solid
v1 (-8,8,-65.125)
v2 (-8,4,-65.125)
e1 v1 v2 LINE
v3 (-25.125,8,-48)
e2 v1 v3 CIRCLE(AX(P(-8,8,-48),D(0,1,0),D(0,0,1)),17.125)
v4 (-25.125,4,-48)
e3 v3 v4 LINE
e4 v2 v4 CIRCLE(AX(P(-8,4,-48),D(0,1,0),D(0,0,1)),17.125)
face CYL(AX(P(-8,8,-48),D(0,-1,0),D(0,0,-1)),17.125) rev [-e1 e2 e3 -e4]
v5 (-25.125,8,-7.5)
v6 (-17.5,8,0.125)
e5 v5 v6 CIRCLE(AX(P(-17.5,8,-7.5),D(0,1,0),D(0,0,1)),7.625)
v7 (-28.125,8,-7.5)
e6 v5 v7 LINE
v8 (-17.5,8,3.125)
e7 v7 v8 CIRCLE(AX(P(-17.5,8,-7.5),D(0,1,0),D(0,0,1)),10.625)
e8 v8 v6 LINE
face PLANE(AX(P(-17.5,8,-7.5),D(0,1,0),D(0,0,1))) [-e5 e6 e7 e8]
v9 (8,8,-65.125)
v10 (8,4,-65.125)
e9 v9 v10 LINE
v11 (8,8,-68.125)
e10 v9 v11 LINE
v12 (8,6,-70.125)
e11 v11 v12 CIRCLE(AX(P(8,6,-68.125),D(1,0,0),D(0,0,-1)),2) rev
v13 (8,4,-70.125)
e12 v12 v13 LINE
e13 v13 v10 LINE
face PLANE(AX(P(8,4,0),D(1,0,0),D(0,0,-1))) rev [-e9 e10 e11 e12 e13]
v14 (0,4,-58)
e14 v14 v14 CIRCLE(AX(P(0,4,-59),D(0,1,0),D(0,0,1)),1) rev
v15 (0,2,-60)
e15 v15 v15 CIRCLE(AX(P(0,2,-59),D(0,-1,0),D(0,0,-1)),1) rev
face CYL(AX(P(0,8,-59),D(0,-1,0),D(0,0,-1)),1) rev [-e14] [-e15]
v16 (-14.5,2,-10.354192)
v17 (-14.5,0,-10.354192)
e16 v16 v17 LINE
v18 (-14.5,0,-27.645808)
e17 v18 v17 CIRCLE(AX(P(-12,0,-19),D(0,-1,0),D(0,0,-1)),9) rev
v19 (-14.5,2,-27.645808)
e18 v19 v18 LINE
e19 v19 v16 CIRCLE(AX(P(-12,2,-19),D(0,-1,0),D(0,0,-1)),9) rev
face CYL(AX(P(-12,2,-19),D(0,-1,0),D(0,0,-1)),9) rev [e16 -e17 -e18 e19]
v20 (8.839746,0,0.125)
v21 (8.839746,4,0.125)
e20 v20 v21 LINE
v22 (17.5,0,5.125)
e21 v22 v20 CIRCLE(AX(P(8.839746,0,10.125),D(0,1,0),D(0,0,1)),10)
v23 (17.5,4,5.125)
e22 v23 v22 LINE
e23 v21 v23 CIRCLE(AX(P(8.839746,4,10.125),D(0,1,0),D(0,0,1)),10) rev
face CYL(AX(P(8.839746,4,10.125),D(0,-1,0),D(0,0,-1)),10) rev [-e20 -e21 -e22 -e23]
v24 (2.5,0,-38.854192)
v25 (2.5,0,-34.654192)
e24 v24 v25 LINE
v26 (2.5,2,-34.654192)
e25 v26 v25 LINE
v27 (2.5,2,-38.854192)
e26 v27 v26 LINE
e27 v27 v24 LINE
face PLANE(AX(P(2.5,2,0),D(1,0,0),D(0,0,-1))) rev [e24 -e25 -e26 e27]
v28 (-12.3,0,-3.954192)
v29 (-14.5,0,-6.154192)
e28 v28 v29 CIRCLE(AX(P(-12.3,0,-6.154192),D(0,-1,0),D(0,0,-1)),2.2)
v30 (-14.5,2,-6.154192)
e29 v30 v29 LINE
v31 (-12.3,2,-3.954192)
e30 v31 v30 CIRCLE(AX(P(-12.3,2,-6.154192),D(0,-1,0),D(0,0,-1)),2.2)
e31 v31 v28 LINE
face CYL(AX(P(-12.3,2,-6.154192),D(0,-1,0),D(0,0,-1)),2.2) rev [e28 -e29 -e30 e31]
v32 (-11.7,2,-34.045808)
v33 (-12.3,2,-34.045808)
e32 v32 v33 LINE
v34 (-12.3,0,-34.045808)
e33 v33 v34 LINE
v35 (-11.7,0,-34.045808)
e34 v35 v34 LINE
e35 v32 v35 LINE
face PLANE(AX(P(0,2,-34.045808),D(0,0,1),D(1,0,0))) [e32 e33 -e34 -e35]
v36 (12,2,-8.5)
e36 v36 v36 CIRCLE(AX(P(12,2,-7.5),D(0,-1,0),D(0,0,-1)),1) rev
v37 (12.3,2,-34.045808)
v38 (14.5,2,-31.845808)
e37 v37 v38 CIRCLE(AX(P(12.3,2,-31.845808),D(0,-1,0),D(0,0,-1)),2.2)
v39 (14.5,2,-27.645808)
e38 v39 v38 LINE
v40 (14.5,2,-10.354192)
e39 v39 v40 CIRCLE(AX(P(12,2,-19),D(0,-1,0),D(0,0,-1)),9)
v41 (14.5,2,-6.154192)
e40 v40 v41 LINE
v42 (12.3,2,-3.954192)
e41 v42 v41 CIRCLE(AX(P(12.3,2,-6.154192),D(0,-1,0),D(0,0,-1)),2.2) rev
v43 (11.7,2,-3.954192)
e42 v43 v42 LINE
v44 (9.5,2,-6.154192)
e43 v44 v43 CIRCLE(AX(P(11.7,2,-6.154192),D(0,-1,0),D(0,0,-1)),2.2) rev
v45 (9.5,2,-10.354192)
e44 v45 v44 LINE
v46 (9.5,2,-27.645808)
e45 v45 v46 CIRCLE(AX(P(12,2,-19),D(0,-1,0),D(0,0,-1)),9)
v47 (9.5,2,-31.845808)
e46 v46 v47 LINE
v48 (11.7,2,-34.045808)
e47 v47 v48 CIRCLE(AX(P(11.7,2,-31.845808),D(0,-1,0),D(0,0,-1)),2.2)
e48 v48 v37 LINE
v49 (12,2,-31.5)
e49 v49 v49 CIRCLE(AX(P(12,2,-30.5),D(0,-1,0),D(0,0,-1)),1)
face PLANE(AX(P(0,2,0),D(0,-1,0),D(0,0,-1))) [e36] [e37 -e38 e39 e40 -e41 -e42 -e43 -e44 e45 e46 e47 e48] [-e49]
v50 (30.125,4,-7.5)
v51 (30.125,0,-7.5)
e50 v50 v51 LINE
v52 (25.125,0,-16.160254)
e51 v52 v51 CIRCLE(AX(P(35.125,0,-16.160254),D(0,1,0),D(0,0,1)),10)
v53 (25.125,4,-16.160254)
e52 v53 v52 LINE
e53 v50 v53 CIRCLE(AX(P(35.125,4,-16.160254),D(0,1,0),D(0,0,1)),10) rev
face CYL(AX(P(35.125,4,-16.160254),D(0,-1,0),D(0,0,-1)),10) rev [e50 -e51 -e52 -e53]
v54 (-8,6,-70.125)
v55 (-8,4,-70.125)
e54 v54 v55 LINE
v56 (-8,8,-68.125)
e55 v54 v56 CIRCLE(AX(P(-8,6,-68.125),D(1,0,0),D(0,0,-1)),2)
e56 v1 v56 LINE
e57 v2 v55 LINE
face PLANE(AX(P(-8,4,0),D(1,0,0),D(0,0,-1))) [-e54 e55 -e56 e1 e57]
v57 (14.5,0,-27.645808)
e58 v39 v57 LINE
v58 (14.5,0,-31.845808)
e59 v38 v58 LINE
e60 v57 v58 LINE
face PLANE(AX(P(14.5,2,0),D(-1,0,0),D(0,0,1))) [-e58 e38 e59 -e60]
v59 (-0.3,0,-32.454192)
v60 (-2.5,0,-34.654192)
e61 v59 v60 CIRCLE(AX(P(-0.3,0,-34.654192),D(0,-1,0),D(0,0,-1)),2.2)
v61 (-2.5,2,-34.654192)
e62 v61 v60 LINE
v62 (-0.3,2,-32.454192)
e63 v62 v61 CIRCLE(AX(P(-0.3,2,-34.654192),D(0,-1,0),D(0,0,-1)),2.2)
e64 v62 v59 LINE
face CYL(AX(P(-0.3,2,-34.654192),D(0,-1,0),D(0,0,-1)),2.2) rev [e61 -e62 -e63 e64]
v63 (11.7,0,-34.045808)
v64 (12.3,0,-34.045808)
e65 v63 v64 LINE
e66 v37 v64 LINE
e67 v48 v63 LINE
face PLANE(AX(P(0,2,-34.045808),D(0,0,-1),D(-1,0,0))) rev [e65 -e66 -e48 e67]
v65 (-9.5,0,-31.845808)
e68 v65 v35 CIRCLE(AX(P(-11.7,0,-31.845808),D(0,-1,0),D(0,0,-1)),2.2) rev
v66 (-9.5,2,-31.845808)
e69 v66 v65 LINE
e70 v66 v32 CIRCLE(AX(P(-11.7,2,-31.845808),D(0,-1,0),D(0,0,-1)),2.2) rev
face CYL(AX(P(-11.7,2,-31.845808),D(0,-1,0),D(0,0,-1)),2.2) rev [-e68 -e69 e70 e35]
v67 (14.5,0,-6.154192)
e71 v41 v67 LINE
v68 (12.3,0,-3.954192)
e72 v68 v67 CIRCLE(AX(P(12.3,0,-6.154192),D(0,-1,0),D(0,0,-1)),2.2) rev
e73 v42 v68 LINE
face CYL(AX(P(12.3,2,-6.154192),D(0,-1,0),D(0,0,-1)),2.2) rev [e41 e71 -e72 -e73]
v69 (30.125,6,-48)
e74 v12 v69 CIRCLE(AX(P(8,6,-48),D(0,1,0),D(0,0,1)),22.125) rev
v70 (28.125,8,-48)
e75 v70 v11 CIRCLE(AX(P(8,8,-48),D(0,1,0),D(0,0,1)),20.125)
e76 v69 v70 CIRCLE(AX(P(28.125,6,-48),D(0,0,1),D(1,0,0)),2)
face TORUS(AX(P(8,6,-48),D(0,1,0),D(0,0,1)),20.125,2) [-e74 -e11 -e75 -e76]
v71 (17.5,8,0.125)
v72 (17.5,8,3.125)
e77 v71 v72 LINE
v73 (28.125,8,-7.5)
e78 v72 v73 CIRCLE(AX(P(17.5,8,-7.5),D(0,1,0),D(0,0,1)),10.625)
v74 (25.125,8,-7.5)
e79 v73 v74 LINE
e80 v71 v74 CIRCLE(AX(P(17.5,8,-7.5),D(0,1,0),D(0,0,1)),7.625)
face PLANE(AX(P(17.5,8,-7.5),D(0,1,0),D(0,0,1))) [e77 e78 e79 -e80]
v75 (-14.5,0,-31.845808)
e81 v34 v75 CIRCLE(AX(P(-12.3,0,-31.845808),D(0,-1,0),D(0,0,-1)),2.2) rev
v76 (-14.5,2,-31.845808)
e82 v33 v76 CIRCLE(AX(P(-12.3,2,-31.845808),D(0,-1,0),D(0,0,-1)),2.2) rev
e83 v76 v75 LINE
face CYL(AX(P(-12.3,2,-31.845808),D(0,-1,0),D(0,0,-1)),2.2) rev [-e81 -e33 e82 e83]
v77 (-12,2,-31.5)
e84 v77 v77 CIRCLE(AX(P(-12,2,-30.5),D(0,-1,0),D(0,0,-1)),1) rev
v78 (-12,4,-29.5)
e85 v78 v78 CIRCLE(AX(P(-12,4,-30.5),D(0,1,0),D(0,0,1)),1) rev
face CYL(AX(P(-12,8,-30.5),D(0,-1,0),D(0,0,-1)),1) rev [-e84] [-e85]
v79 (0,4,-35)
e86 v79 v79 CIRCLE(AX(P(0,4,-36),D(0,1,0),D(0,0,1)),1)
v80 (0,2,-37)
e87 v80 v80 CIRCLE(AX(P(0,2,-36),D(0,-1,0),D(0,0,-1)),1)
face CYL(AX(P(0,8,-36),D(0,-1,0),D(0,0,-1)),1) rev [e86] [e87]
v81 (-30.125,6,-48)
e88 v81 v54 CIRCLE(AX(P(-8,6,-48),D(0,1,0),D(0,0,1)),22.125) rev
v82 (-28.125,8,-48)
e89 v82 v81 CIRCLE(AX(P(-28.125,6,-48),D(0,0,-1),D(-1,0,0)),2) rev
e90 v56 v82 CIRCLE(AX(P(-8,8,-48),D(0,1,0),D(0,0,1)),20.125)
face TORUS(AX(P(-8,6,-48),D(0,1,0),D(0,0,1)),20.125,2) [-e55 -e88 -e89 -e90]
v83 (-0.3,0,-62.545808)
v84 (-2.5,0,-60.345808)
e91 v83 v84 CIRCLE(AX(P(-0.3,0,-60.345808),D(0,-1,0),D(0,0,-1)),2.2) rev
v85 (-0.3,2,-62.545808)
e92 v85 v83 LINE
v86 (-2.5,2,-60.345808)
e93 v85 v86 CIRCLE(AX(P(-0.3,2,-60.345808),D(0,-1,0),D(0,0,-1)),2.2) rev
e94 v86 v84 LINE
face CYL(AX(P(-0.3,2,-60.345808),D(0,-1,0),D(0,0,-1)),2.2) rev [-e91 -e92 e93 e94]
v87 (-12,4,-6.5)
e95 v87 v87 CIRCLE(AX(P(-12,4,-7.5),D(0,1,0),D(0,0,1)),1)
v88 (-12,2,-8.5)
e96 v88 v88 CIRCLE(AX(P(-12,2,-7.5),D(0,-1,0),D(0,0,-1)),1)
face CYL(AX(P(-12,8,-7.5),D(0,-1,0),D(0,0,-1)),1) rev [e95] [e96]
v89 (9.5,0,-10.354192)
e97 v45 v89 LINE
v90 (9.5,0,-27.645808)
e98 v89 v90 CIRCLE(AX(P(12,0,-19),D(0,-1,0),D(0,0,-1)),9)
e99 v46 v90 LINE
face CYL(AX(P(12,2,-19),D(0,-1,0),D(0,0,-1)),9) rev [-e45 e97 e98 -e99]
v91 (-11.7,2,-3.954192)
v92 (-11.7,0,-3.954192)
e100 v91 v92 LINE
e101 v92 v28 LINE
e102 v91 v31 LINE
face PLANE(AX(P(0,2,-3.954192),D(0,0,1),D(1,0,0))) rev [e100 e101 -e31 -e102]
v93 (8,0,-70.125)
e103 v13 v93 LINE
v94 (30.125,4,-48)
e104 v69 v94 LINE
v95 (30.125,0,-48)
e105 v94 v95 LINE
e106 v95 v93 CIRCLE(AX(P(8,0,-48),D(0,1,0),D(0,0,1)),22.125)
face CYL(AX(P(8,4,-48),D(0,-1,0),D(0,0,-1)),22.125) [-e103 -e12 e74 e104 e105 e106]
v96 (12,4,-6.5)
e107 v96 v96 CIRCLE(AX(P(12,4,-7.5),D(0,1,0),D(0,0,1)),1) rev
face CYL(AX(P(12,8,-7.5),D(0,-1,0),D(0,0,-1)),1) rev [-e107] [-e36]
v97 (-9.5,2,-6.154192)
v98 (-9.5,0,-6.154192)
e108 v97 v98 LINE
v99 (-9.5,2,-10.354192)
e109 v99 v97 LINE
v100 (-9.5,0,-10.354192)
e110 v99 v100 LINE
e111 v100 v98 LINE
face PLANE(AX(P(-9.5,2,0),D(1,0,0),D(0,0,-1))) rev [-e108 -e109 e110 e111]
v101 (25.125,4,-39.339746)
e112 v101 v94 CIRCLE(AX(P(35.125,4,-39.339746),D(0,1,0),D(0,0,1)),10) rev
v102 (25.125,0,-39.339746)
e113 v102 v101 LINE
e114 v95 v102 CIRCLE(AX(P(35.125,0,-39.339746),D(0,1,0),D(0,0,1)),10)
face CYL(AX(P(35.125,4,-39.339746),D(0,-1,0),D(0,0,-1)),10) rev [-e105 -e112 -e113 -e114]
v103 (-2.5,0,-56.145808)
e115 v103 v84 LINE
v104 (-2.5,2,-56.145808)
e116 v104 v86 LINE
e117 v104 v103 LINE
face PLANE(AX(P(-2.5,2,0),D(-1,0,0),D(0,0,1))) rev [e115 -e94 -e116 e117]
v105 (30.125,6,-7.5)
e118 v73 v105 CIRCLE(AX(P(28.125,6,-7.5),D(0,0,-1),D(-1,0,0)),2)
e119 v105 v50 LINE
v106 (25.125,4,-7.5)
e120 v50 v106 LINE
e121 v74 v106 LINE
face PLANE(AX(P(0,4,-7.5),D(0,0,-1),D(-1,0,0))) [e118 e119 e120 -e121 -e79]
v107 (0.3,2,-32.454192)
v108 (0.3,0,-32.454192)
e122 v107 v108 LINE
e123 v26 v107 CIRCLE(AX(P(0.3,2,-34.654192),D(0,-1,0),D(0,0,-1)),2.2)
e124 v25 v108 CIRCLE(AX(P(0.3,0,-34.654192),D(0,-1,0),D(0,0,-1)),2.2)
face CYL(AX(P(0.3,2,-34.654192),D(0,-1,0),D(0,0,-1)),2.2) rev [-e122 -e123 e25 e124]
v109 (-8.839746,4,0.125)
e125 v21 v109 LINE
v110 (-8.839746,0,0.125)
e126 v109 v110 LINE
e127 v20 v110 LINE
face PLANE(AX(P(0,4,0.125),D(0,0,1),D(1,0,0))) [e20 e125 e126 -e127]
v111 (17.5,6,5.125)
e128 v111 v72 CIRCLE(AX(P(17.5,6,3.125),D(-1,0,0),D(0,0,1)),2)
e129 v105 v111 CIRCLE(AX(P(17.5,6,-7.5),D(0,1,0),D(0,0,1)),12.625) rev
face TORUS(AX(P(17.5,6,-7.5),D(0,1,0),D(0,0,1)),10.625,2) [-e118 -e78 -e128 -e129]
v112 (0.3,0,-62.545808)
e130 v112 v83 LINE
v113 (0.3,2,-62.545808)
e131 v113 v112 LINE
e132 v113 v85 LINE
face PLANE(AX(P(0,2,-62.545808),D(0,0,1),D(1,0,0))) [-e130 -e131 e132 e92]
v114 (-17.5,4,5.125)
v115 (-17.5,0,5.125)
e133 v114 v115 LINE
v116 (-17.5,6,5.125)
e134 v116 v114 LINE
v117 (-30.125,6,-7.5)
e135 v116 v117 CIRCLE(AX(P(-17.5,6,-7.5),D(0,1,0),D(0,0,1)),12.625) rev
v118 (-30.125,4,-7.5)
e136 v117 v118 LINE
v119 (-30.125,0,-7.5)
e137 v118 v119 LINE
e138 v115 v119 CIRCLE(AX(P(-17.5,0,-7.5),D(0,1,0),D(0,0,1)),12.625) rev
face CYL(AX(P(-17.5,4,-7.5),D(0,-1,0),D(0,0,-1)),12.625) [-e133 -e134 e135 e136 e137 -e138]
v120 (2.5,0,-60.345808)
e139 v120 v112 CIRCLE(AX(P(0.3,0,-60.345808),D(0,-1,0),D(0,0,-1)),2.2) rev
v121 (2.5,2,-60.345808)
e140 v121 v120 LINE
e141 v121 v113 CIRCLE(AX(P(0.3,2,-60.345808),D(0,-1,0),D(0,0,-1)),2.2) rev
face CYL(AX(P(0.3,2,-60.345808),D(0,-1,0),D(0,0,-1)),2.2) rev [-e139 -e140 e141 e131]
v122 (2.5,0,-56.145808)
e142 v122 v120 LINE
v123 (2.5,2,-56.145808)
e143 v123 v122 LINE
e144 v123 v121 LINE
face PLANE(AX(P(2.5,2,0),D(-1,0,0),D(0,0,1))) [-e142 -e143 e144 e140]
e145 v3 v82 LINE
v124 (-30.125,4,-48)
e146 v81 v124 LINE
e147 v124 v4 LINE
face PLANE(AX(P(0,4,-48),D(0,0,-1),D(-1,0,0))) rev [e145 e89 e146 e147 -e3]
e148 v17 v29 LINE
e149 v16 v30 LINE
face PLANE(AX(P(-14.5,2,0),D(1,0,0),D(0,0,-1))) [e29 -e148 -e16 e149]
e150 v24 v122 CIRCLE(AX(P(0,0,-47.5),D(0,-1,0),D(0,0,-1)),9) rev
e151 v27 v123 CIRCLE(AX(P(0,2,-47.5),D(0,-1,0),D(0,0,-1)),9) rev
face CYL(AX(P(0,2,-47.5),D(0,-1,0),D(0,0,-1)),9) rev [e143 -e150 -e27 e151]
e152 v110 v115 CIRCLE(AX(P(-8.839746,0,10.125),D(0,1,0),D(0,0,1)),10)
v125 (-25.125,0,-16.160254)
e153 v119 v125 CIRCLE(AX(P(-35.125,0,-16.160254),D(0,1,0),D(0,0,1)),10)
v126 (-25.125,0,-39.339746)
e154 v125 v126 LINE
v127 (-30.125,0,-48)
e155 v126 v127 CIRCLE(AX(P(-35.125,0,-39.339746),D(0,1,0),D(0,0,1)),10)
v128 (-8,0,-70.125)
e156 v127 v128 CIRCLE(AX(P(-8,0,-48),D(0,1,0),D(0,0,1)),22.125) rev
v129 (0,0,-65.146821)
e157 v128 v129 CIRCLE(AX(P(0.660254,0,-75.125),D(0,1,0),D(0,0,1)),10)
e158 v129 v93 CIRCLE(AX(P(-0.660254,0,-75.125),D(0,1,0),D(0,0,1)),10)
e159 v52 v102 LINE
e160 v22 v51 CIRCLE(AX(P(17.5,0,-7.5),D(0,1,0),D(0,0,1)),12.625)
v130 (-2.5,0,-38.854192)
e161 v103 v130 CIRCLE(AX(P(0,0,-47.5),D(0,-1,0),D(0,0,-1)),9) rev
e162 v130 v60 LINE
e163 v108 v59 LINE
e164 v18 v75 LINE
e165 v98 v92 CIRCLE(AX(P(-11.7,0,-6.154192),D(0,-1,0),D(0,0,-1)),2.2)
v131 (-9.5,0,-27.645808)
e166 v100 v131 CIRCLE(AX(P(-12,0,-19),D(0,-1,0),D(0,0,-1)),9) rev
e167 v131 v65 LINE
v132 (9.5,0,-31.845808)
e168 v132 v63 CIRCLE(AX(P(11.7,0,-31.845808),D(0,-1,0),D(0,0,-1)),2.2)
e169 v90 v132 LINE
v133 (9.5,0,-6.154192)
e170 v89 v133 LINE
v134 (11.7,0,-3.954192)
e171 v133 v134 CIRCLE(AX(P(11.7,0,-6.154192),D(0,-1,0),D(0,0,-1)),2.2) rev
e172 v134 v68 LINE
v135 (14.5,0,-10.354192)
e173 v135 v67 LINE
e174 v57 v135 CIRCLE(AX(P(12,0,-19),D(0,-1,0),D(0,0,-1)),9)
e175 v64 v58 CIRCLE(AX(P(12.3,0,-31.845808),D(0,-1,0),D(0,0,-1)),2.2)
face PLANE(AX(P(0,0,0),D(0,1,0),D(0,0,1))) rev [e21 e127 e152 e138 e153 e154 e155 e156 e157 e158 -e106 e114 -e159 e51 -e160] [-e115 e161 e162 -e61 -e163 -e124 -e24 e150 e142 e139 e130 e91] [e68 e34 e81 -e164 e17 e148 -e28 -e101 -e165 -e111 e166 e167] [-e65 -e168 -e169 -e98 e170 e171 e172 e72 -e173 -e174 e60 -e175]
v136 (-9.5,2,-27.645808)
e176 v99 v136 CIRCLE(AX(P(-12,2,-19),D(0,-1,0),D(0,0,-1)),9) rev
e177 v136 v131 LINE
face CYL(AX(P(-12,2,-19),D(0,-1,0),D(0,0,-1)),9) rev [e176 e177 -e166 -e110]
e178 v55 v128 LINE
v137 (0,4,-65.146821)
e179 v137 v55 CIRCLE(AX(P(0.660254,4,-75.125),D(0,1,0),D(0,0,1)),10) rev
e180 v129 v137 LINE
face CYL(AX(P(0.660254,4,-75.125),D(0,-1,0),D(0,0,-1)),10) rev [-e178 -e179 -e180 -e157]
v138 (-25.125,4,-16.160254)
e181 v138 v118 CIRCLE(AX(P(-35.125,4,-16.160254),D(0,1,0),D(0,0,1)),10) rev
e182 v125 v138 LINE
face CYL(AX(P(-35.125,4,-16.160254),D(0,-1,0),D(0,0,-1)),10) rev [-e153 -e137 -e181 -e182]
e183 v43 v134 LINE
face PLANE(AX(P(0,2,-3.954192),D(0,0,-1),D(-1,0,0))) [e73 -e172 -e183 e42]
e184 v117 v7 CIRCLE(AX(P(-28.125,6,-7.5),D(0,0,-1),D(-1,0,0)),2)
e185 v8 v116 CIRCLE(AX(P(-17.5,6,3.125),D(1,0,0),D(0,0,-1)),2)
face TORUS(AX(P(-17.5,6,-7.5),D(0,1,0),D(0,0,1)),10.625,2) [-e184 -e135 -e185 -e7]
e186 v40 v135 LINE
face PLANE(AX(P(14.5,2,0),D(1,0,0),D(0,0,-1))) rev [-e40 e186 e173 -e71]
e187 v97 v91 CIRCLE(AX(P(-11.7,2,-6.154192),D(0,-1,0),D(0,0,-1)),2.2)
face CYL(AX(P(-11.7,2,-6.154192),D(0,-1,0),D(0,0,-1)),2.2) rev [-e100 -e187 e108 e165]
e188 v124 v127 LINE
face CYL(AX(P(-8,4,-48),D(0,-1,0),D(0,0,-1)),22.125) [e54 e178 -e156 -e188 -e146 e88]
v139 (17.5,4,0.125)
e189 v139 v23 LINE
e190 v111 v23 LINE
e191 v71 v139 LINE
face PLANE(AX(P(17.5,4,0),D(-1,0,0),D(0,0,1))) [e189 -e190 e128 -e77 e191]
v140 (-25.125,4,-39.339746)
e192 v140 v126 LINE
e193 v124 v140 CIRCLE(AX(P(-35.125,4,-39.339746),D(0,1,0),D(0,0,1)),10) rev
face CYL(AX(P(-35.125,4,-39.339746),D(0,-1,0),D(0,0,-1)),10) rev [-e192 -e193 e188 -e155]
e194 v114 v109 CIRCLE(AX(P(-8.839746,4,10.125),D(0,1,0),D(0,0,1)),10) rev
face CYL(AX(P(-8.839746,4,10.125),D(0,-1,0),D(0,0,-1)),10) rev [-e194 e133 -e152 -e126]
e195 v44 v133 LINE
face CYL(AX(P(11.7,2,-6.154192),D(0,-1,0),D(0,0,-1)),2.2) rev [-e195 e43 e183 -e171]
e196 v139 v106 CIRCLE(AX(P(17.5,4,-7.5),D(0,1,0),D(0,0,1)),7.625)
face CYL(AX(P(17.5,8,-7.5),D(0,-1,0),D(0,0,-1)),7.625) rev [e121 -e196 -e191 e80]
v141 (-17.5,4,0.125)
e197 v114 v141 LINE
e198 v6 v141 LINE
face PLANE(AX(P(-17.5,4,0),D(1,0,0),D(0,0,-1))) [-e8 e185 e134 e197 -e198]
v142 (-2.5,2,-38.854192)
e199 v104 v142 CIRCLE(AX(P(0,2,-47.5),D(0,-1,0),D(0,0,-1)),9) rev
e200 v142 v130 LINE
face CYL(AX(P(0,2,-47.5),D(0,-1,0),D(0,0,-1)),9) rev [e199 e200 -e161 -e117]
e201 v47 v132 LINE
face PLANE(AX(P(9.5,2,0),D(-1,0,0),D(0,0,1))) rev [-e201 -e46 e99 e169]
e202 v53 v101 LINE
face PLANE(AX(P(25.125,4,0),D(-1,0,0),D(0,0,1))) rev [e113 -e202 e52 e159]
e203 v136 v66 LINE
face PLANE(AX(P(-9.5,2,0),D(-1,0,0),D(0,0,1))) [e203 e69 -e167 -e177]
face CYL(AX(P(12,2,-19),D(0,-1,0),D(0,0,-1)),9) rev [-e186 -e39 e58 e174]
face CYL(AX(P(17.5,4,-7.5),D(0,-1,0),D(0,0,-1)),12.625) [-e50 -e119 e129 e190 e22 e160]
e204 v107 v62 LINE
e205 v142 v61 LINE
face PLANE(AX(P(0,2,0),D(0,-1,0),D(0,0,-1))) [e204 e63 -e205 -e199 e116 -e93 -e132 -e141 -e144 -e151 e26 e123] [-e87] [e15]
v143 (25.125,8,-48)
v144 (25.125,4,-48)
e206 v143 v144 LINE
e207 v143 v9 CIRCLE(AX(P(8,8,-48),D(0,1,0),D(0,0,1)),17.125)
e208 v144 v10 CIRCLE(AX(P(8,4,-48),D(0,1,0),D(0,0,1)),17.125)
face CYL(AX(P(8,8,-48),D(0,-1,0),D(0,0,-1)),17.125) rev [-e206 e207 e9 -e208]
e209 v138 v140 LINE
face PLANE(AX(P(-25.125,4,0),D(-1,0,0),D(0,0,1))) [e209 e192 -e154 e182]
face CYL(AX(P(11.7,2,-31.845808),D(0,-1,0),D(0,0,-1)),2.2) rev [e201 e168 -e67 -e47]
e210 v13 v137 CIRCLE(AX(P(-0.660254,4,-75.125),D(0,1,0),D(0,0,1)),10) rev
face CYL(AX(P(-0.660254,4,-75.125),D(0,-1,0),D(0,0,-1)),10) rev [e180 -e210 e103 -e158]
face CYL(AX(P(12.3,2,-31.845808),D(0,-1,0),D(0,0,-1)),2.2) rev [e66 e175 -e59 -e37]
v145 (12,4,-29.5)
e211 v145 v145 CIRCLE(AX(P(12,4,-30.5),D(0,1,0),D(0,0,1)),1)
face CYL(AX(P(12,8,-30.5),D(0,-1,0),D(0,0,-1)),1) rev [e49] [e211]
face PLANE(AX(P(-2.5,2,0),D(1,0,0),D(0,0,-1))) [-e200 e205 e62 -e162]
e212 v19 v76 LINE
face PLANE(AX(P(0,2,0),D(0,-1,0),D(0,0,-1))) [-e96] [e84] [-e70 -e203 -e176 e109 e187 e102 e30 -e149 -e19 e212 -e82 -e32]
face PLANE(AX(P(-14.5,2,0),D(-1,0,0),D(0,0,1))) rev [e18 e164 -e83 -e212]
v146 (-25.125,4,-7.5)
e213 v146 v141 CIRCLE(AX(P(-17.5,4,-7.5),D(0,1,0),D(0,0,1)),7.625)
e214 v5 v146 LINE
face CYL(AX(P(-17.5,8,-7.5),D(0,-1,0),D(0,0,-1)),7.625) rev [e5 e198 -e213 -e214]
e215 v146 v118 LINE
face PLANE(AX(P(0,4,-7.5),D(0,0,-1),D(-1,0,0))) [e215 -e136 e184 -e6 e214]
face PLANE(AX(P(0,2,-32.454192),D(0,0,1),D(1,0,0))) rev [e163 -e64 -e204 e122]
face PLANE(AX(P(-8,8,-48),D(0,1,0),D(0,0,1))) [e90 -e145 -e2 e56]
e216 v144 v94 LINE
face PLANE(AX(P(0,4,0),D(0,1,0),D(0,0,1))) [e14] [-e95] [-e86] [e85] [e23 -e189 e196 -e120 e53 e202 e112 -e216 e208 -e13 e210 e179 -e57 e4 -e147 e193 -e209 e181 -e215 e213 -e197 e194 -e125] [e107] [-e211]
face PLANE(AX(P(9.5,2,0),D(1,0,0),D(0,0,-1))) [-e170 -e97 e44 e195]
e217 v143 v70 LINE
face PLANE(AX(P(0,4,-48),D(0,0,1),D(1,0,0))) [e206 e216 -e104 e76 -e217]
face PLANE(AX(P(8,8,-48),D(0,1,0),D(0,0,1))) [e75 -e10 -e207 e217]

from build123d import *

# Parameters (mm, degrees)
SALIENTE_EXTRUIR1_DEPTH = 4
SALIENTE_EXTRUIR2_START = 4
SALIENTE_EXTRUIR2_DEPTH = 4
REDONDEO1_R             = 10
REDONDEO3_R             = 2
CROQUIS3_R              = 1
CROQUIS3_R_2            = 9
CORTAR_EXTRUIR1_DEPTH   = 2
CROQUIS3_3_R            = 1
CORTAR_EXTRUIR2_DEPTH   = 77.740023923


with BuildPart() as part:
    # Croquis1 → Saliente-Extruir1 (new body)
    with BuildSketch(Plane(origin=(0, 0, 0), x_dir=(1, 0, 0), z_dir=(0, 1, 0))):
        with BuildLine():
            Line((30.125, 7.5), (25.125, 7.5))
            Line((25.125, 7.5), (25.125, 48))
            Line((25.125, 48), (30.125, 48))
            ThreePointArc((30.125, 48), (23.644737534, 63.644737534), (8, 70.125))
            Line((8, 70.125), (8, 65.125))
            Line((8, 65.125), (-8, 65.125))
            Line((-8, 65.125), (-8, 70.125))
            ThreePointArc((-8, 70.125), (-23.644737534, 63.644737534), (-30.125, 48))
            Line((-30.125, 48), (-25.125, 48))
            Line((-25.125, 48), (-25.125, 7.5))
            Line((-25.125, 7.5), (-30.125, 7.5))
            ThreePointArc((-30.125, 7.5), (-26.427223112, -1.427223112), (-17.5, -5.125))
            Line((-17.5, -5.125), (-17.5, -0.125))
            Line((-17.5, -0.125), (17.5, -0.125))
            Line((17.5, -0.125), (17.5, -5.125))
            ThreePointArc((17.5, -5.125), (26.427223112, -1.427223112), (30.125, 7.5))
        make_face()
    extrude(amount=SALIENTE_EXTRUIR1_DEPTH)

    # Croquis1<3> → Saliente-Extruir2 (add)
    with BuildSketch(Plane(origin=(0, 0, 0), x_dir=(1, 0, 0), z_dir=(0, 1, 0)).offset(SALIENTE_EXTRUIR2_START)):
        with BuildLine():
            Line((-30.125, 48), (-25.125, 48))
            ThreePointArc((-25.125, 48), (-20.109203628, 60.109203628), (-8, 65.125))
            Line((-8, 65.125), (-8, 70.125))
            ThreePointArc((-8, 70.125), (-23.644737534, 63.644737534), (-30.125, 48))
        make_face()
        with BuildLine():
            Line((-17.5, -5.125), (-17.5, -0.125))
            ThreePointArc((-17.5, -0.125), (-22.891689207, 2.108310793), (-25.125, 7.5))
            Line((-25.125, 7.5), (-30.125, 7.5))
            ThreePointArc((-30.125, 7.5), (-26.427223112, -1.427223112), (-17.5, -5.125))
        make_face()
        with BuildLine():
            ThreePointArc((25.125, 7.5), (22.891689207, 2.108310793), (17.5, -0.125))
            Line((17.5, -0.125), (17.5, -5.125))
            ThreePointArc((17.5, -5.125), (26.427223112, -1.427223112), (30.125, 7.5))
            Line((30.125, 7.5), (25.125, 7.5))
        make_face()
        with BuildLine():
            ThreePointArc((8, 65.125), (20.109203628, 60.109203628), (25.125, 48))
            Line((25.125, 48), (30.125, 48))
            ThreePointArc((30.125, 48), (23.644737534, 63.644737534), (8, 70.125))
            Line((8, 70.125), (8, 65.125))
        make_face()
    extrude(amount=SALIENTE_EXTRUIR2_DEPTH)

    # Redondeo1
    # the kernel refuses this fillet: 10 mm, written as the material it adds along each edge
    with BuildSketch(Plane(origin=(8, 0, -65.125), x_dir=(-1, 0, 0), z_dir=(0, 1, 0)), Plane(origin=(-17.5, 0, 0.125), x_dir=(1, 0, 0), z_dir=(0, 1, 0)), Plane(origin=(-25.125, 0, -48), x_dir=(0, 0, 1), z_dir=(0, 1, 0))) as redondeo1_piece_1:
        with BuildLine():
            CenterArc((8.660254038, -10), REDONDEO1_R, 90, 60)
            Line((0, -5), (-0.173205081, -4.9))
            ThreePointArc((-0.173205081, -4.9), (-0.2, -2.5), (-0.2, 0))
            Line((-0.2, 0), (0, 0.2))
            Line((0, 0.2), (8.660254038, 0.2))
            Line((8.660254038, 0.2), (8.660254038, 0))
        make_face()
    extrude(amount=4)
    with BuildSketch(Plane(origin=(-8, 0, -65.125), x_dir=(0, 0, -1), z_dir=(0, 1, 0)), Plane(origin=(17.5, 0, 0.125), x_dir=(0, 0, 1), z_dir=(0, 1, 0)), Plane(origin=(25.125, 0, -48), x_dir=(1, 0, 0), z_dir=(0, 1, 0)), Plane(origin=(-25.125, 0, -7.5), x_dir=(-1, 0, 0), z_dir=(0, 1, 0))) as redondeo1_piece_2:
        with BuildLine():
            CenterArc((10, -8.660254038), REDONDEO1_R, 120, 60)
            Line((0, -8.660254038), (-0.2, -8.660254038))
            Line((-0.2, -8.660254038), (-0.2, 0))
            Line((-0.2, 0), (0, 0.2))
            ThreePointArc((0, 0.2), (2.5, 0.2), (4.9, 0.173205081))
            Line((4.9, 0.173205081), (5, 0))
        make_face()
    extrude(amount=4)
    with BuildSketch(Plane(origin=(25.125, 0, -7.5), x_dir=(1, 0, 0), z_dir=(0, 1, 0))) as redondeo1_piece_3:
        with BuildLine():
            CenterArc((10, 8.660254038), REDONDEO1_R, 180, 60)
            Line((0, 8.660254038), (-0.2, 8.660254038))
            Line((-0.2, 8.660254038), (-0.2, 0))
            Line((-0.2, 0), (0, -0.2))
            ThreePointArc((0, -0.2), (2.5, -0.2), (4.9, -0.173205081))
            Line((4.9, -0.173205081), (5, 0))
        make_face()
    extrude(amount=4)

    # Redondeo3
    redondeo3_edges = [part.edges().sort_by_distance(p)[0] for p in [
        (-23.644737534, 8, -63.644737534),
        (-26.427223112, 8, 1.427223112),
        (26.427223112, 8, 1.427223112),
        (23.644737534, 8, -63.644737534),
    ]]
    fillet(redondeo3_edges, radius=REDONDEO3_R)

    # Croquis3 → Cortar-Extruir1 (cut)
    # profile 1 of 5: a face of its own
    with BuildSketch(Plane(origin=(0, 0, 0), x_dir=(1, 0, 0), z_dir=(0, 1, 0))):
        with BuildLine():
            ThreePointArc((-9.5, 10.354191767), (-3, 19), (-9.5, 27.645808233))
            Line((-9.5, 27.645808233), (-9.5, 31.845808233))
            ThreePointArc((-9.5, 31.845808233), (-10.144365081, 33.401443152), (-11.7, 34.045808233))
            Line((-11.7, 34.045808233), (-12.3, 34.045808233))
            ThreePointArc((-12.3, 34.045808233), (-13.855634919, 33.401443152), (-14.5, 31.845808233))
            Line((-14.5, 31.845808233), (-14.5, 27.645808233))
            ThreePointArc((-14.5, 27.645808233), (-21, 19), (-14.5, 10.354191767))
            Line((-14.5, 10.354191767), (-14.5, 6.154191767))
            ThreePointArc((-14.5, 6.154191767), (-13.855634919, 4.598556848), (-12.3, 3.954191767))
            Line((-12.3, 3.954191767), (-11.7, 3.954191767))
            ThreePointArc((-11.7, 3.954191767), (-10.144365081, 4.598556848), (-9.5, 6.154191767))
            Line((-9.5, 6.154191767), (-9.5, 10.354191767))
        make_face()
        with Locations(Location((-12, 7.5, 0), (0, 0, 90))):
            Circle(CROQUIS3_R, mode=Mode.SUBTRACT)
        with Locations(Location((-12, 30.5, 0), (0, 0, 90))):
            Circle(CROQUIS3_R, mode=Mode.SUBTRACT)
    # profile 2 of 5: a face of its own
    with BuildSketch(Plane(origin=(0, 0, 0), x_dir=(1, 0, 0), z_dir=(0, 1, 0))):
        with BuildLine():
            Line((14.5, 27.645808233), (14.5, 31.845808233))
            ThreePointArc((14.5, 31.845808233), (13.855634919, 33.401443152), (12.3, 34.045808233))
            Line((12.3, 34.045808233), (11.7, 34.045808233))
            ThreePointArc((11.7, 34.045808233), (10.144365081, 33.401443152), (9.5, 31.845808233))
            Line((9.5, 31.845808233), (9.5, 27.645808233))
            ThreePointArc((9.5, 27.645808233), (3, 19), (9.5, 10.354191767))
            Line((9.5, 10.354191767), (9.5, 6.154191767))
            ThreePointArc((9.5, 6.154191767), (10.144365081, 4.598556848), (11.7, 3.954191767))
            Line((11.7, 3.954191767), (12.3, 3.954191767))
            ThreePointArc((12.3, 3.954191767), (13.855634919, 4.598556848), (14.5, 6.154191767))
            Line((14.5, 6.154191767), (14.5, 10.354191767))
            ThreePointArc((14.5, 10.354191767), (21, 19), (14.5, 27.645808233))
        make_face()
        with Locations(Location((12, 7.5, 0), (0, 0, 90))):
            Circle(CROQUIS3_R, mode=Mode.SUBTRACT)
        with Locations(Location((12, 30.5, 0), (0, 0, 90))):
            Circle(CROQUIS3_R, mode=Mode.SUBTRACT)
    # profile 3 of 5: a face of its own
    with BuildSketch(Plane(origin=(0, 0, 0), x_dir=(1, 0, 0), z_dir=(0, 1, 0))):
        with Locations((0, 47.5)):
            Circle(CROQUIS3_R_2)
    # profile 4 of 5: a face of its own
    with BuildSketch(Plane(origin=(0, 0, 0), x_dir=(1, 0, 0), z_dir=(0, 1, 0))):
        with BuildLine():
            Line((2.5, 34.654191767), (2.5, 38.854191767))
            ThreePointArc((2.5, 38.854191767), (0, 38.5), (-2.5, 38.854191767))
            Line((-2.5, 38.854191767), (-2.5, 34.654191767))
            ThreePointArc((-2.5, 34.654191767), (-1.855634919, 33.098556848), (-0.3, 32.454191767))
            Line((-0.3, 32.454191767), (0.3, 32.454191767))
            ThreePointArc((0.3, 32.454191767), (1.855634919, 33.098556848), (2.5, 34.654191767))
        make_face()
        with Locations(Location((0, 36, 0), (0, 0, 90))):
            Circle(CROQUIS3_R, mode=Mode.SUBTRACT)
    # profile 5 of 5: a face of its own
    with BuildSketch(Plane(origin=(0, 0, 0), x_dir=(1, 0, 0), z_dir=(0, 1, 0))):
        with BuildLine():
            ThreePointArc((-2.5, 56.145808233), (0, 56.5), (2.5, 56.145808233))
            Line((2.5, 56.145808233), (2.5, 60.345808233))
            ThreePointArc((2.5, 60.345808233), (1.855634919, 61.901443152), (0.3, 62.545808233))
            Line((0.3, 62.545808233), (-0.3, 62.545808233))
            ThreePointArc((-0.3, 62.545808233), (-1.855634919, 61.901443152), (-2.5, 60.345808233))
            Line((-2.5, 60.345808233), (-2.5, 56.145808233))
        make_face()
        with Locations(Location((0, 59, 0), (0, 0, 90))):
            Circle(CROQUIS3_R, mode=Mode.SUBTRACT)
    extrude(amount=CORTAR_EXTRUIR1_DEPTH, mode=Mode.SUBTRACT)

    # Croquis3<3> → Cortar-Extruir2 (cut, through all)
    with BuildSketch(Plane(origin=(0, 0, 0), x_dir=(1, 0, 0), z_dir=(0, 1, 0))):
        with Locations(Location((-12, 7.5, 0), (0, 0, 90))):
            Circle(CROQUIS3_3_R)
        with Locations(Location((-12, 30.5, 0), (0, 0, 90))):
            Circle(CROQUIS3_3_R)
        with Locations(Location((12, 7.5, 0), (0, 0, 90))):
            Circle(CROQUIS3_3_R)
        with Locations(Location((12, 30.5, 0), (0, 0, 90))):
            Circle(CROQUIS3_3_R)
        with Locations(Location((0, 59, 0), (0, 0, 90))):
            Circle(CROQUIS3_3_R)
        with Locations(Location((0, 36, 0), (0, 0, 90))):
            Circle(CROQUIS3_3_R)
    extrude(amount=CORTAR_EXTRUIR2_DEPTH, mode=Mode.SUBTRACT)


solid = part.part
